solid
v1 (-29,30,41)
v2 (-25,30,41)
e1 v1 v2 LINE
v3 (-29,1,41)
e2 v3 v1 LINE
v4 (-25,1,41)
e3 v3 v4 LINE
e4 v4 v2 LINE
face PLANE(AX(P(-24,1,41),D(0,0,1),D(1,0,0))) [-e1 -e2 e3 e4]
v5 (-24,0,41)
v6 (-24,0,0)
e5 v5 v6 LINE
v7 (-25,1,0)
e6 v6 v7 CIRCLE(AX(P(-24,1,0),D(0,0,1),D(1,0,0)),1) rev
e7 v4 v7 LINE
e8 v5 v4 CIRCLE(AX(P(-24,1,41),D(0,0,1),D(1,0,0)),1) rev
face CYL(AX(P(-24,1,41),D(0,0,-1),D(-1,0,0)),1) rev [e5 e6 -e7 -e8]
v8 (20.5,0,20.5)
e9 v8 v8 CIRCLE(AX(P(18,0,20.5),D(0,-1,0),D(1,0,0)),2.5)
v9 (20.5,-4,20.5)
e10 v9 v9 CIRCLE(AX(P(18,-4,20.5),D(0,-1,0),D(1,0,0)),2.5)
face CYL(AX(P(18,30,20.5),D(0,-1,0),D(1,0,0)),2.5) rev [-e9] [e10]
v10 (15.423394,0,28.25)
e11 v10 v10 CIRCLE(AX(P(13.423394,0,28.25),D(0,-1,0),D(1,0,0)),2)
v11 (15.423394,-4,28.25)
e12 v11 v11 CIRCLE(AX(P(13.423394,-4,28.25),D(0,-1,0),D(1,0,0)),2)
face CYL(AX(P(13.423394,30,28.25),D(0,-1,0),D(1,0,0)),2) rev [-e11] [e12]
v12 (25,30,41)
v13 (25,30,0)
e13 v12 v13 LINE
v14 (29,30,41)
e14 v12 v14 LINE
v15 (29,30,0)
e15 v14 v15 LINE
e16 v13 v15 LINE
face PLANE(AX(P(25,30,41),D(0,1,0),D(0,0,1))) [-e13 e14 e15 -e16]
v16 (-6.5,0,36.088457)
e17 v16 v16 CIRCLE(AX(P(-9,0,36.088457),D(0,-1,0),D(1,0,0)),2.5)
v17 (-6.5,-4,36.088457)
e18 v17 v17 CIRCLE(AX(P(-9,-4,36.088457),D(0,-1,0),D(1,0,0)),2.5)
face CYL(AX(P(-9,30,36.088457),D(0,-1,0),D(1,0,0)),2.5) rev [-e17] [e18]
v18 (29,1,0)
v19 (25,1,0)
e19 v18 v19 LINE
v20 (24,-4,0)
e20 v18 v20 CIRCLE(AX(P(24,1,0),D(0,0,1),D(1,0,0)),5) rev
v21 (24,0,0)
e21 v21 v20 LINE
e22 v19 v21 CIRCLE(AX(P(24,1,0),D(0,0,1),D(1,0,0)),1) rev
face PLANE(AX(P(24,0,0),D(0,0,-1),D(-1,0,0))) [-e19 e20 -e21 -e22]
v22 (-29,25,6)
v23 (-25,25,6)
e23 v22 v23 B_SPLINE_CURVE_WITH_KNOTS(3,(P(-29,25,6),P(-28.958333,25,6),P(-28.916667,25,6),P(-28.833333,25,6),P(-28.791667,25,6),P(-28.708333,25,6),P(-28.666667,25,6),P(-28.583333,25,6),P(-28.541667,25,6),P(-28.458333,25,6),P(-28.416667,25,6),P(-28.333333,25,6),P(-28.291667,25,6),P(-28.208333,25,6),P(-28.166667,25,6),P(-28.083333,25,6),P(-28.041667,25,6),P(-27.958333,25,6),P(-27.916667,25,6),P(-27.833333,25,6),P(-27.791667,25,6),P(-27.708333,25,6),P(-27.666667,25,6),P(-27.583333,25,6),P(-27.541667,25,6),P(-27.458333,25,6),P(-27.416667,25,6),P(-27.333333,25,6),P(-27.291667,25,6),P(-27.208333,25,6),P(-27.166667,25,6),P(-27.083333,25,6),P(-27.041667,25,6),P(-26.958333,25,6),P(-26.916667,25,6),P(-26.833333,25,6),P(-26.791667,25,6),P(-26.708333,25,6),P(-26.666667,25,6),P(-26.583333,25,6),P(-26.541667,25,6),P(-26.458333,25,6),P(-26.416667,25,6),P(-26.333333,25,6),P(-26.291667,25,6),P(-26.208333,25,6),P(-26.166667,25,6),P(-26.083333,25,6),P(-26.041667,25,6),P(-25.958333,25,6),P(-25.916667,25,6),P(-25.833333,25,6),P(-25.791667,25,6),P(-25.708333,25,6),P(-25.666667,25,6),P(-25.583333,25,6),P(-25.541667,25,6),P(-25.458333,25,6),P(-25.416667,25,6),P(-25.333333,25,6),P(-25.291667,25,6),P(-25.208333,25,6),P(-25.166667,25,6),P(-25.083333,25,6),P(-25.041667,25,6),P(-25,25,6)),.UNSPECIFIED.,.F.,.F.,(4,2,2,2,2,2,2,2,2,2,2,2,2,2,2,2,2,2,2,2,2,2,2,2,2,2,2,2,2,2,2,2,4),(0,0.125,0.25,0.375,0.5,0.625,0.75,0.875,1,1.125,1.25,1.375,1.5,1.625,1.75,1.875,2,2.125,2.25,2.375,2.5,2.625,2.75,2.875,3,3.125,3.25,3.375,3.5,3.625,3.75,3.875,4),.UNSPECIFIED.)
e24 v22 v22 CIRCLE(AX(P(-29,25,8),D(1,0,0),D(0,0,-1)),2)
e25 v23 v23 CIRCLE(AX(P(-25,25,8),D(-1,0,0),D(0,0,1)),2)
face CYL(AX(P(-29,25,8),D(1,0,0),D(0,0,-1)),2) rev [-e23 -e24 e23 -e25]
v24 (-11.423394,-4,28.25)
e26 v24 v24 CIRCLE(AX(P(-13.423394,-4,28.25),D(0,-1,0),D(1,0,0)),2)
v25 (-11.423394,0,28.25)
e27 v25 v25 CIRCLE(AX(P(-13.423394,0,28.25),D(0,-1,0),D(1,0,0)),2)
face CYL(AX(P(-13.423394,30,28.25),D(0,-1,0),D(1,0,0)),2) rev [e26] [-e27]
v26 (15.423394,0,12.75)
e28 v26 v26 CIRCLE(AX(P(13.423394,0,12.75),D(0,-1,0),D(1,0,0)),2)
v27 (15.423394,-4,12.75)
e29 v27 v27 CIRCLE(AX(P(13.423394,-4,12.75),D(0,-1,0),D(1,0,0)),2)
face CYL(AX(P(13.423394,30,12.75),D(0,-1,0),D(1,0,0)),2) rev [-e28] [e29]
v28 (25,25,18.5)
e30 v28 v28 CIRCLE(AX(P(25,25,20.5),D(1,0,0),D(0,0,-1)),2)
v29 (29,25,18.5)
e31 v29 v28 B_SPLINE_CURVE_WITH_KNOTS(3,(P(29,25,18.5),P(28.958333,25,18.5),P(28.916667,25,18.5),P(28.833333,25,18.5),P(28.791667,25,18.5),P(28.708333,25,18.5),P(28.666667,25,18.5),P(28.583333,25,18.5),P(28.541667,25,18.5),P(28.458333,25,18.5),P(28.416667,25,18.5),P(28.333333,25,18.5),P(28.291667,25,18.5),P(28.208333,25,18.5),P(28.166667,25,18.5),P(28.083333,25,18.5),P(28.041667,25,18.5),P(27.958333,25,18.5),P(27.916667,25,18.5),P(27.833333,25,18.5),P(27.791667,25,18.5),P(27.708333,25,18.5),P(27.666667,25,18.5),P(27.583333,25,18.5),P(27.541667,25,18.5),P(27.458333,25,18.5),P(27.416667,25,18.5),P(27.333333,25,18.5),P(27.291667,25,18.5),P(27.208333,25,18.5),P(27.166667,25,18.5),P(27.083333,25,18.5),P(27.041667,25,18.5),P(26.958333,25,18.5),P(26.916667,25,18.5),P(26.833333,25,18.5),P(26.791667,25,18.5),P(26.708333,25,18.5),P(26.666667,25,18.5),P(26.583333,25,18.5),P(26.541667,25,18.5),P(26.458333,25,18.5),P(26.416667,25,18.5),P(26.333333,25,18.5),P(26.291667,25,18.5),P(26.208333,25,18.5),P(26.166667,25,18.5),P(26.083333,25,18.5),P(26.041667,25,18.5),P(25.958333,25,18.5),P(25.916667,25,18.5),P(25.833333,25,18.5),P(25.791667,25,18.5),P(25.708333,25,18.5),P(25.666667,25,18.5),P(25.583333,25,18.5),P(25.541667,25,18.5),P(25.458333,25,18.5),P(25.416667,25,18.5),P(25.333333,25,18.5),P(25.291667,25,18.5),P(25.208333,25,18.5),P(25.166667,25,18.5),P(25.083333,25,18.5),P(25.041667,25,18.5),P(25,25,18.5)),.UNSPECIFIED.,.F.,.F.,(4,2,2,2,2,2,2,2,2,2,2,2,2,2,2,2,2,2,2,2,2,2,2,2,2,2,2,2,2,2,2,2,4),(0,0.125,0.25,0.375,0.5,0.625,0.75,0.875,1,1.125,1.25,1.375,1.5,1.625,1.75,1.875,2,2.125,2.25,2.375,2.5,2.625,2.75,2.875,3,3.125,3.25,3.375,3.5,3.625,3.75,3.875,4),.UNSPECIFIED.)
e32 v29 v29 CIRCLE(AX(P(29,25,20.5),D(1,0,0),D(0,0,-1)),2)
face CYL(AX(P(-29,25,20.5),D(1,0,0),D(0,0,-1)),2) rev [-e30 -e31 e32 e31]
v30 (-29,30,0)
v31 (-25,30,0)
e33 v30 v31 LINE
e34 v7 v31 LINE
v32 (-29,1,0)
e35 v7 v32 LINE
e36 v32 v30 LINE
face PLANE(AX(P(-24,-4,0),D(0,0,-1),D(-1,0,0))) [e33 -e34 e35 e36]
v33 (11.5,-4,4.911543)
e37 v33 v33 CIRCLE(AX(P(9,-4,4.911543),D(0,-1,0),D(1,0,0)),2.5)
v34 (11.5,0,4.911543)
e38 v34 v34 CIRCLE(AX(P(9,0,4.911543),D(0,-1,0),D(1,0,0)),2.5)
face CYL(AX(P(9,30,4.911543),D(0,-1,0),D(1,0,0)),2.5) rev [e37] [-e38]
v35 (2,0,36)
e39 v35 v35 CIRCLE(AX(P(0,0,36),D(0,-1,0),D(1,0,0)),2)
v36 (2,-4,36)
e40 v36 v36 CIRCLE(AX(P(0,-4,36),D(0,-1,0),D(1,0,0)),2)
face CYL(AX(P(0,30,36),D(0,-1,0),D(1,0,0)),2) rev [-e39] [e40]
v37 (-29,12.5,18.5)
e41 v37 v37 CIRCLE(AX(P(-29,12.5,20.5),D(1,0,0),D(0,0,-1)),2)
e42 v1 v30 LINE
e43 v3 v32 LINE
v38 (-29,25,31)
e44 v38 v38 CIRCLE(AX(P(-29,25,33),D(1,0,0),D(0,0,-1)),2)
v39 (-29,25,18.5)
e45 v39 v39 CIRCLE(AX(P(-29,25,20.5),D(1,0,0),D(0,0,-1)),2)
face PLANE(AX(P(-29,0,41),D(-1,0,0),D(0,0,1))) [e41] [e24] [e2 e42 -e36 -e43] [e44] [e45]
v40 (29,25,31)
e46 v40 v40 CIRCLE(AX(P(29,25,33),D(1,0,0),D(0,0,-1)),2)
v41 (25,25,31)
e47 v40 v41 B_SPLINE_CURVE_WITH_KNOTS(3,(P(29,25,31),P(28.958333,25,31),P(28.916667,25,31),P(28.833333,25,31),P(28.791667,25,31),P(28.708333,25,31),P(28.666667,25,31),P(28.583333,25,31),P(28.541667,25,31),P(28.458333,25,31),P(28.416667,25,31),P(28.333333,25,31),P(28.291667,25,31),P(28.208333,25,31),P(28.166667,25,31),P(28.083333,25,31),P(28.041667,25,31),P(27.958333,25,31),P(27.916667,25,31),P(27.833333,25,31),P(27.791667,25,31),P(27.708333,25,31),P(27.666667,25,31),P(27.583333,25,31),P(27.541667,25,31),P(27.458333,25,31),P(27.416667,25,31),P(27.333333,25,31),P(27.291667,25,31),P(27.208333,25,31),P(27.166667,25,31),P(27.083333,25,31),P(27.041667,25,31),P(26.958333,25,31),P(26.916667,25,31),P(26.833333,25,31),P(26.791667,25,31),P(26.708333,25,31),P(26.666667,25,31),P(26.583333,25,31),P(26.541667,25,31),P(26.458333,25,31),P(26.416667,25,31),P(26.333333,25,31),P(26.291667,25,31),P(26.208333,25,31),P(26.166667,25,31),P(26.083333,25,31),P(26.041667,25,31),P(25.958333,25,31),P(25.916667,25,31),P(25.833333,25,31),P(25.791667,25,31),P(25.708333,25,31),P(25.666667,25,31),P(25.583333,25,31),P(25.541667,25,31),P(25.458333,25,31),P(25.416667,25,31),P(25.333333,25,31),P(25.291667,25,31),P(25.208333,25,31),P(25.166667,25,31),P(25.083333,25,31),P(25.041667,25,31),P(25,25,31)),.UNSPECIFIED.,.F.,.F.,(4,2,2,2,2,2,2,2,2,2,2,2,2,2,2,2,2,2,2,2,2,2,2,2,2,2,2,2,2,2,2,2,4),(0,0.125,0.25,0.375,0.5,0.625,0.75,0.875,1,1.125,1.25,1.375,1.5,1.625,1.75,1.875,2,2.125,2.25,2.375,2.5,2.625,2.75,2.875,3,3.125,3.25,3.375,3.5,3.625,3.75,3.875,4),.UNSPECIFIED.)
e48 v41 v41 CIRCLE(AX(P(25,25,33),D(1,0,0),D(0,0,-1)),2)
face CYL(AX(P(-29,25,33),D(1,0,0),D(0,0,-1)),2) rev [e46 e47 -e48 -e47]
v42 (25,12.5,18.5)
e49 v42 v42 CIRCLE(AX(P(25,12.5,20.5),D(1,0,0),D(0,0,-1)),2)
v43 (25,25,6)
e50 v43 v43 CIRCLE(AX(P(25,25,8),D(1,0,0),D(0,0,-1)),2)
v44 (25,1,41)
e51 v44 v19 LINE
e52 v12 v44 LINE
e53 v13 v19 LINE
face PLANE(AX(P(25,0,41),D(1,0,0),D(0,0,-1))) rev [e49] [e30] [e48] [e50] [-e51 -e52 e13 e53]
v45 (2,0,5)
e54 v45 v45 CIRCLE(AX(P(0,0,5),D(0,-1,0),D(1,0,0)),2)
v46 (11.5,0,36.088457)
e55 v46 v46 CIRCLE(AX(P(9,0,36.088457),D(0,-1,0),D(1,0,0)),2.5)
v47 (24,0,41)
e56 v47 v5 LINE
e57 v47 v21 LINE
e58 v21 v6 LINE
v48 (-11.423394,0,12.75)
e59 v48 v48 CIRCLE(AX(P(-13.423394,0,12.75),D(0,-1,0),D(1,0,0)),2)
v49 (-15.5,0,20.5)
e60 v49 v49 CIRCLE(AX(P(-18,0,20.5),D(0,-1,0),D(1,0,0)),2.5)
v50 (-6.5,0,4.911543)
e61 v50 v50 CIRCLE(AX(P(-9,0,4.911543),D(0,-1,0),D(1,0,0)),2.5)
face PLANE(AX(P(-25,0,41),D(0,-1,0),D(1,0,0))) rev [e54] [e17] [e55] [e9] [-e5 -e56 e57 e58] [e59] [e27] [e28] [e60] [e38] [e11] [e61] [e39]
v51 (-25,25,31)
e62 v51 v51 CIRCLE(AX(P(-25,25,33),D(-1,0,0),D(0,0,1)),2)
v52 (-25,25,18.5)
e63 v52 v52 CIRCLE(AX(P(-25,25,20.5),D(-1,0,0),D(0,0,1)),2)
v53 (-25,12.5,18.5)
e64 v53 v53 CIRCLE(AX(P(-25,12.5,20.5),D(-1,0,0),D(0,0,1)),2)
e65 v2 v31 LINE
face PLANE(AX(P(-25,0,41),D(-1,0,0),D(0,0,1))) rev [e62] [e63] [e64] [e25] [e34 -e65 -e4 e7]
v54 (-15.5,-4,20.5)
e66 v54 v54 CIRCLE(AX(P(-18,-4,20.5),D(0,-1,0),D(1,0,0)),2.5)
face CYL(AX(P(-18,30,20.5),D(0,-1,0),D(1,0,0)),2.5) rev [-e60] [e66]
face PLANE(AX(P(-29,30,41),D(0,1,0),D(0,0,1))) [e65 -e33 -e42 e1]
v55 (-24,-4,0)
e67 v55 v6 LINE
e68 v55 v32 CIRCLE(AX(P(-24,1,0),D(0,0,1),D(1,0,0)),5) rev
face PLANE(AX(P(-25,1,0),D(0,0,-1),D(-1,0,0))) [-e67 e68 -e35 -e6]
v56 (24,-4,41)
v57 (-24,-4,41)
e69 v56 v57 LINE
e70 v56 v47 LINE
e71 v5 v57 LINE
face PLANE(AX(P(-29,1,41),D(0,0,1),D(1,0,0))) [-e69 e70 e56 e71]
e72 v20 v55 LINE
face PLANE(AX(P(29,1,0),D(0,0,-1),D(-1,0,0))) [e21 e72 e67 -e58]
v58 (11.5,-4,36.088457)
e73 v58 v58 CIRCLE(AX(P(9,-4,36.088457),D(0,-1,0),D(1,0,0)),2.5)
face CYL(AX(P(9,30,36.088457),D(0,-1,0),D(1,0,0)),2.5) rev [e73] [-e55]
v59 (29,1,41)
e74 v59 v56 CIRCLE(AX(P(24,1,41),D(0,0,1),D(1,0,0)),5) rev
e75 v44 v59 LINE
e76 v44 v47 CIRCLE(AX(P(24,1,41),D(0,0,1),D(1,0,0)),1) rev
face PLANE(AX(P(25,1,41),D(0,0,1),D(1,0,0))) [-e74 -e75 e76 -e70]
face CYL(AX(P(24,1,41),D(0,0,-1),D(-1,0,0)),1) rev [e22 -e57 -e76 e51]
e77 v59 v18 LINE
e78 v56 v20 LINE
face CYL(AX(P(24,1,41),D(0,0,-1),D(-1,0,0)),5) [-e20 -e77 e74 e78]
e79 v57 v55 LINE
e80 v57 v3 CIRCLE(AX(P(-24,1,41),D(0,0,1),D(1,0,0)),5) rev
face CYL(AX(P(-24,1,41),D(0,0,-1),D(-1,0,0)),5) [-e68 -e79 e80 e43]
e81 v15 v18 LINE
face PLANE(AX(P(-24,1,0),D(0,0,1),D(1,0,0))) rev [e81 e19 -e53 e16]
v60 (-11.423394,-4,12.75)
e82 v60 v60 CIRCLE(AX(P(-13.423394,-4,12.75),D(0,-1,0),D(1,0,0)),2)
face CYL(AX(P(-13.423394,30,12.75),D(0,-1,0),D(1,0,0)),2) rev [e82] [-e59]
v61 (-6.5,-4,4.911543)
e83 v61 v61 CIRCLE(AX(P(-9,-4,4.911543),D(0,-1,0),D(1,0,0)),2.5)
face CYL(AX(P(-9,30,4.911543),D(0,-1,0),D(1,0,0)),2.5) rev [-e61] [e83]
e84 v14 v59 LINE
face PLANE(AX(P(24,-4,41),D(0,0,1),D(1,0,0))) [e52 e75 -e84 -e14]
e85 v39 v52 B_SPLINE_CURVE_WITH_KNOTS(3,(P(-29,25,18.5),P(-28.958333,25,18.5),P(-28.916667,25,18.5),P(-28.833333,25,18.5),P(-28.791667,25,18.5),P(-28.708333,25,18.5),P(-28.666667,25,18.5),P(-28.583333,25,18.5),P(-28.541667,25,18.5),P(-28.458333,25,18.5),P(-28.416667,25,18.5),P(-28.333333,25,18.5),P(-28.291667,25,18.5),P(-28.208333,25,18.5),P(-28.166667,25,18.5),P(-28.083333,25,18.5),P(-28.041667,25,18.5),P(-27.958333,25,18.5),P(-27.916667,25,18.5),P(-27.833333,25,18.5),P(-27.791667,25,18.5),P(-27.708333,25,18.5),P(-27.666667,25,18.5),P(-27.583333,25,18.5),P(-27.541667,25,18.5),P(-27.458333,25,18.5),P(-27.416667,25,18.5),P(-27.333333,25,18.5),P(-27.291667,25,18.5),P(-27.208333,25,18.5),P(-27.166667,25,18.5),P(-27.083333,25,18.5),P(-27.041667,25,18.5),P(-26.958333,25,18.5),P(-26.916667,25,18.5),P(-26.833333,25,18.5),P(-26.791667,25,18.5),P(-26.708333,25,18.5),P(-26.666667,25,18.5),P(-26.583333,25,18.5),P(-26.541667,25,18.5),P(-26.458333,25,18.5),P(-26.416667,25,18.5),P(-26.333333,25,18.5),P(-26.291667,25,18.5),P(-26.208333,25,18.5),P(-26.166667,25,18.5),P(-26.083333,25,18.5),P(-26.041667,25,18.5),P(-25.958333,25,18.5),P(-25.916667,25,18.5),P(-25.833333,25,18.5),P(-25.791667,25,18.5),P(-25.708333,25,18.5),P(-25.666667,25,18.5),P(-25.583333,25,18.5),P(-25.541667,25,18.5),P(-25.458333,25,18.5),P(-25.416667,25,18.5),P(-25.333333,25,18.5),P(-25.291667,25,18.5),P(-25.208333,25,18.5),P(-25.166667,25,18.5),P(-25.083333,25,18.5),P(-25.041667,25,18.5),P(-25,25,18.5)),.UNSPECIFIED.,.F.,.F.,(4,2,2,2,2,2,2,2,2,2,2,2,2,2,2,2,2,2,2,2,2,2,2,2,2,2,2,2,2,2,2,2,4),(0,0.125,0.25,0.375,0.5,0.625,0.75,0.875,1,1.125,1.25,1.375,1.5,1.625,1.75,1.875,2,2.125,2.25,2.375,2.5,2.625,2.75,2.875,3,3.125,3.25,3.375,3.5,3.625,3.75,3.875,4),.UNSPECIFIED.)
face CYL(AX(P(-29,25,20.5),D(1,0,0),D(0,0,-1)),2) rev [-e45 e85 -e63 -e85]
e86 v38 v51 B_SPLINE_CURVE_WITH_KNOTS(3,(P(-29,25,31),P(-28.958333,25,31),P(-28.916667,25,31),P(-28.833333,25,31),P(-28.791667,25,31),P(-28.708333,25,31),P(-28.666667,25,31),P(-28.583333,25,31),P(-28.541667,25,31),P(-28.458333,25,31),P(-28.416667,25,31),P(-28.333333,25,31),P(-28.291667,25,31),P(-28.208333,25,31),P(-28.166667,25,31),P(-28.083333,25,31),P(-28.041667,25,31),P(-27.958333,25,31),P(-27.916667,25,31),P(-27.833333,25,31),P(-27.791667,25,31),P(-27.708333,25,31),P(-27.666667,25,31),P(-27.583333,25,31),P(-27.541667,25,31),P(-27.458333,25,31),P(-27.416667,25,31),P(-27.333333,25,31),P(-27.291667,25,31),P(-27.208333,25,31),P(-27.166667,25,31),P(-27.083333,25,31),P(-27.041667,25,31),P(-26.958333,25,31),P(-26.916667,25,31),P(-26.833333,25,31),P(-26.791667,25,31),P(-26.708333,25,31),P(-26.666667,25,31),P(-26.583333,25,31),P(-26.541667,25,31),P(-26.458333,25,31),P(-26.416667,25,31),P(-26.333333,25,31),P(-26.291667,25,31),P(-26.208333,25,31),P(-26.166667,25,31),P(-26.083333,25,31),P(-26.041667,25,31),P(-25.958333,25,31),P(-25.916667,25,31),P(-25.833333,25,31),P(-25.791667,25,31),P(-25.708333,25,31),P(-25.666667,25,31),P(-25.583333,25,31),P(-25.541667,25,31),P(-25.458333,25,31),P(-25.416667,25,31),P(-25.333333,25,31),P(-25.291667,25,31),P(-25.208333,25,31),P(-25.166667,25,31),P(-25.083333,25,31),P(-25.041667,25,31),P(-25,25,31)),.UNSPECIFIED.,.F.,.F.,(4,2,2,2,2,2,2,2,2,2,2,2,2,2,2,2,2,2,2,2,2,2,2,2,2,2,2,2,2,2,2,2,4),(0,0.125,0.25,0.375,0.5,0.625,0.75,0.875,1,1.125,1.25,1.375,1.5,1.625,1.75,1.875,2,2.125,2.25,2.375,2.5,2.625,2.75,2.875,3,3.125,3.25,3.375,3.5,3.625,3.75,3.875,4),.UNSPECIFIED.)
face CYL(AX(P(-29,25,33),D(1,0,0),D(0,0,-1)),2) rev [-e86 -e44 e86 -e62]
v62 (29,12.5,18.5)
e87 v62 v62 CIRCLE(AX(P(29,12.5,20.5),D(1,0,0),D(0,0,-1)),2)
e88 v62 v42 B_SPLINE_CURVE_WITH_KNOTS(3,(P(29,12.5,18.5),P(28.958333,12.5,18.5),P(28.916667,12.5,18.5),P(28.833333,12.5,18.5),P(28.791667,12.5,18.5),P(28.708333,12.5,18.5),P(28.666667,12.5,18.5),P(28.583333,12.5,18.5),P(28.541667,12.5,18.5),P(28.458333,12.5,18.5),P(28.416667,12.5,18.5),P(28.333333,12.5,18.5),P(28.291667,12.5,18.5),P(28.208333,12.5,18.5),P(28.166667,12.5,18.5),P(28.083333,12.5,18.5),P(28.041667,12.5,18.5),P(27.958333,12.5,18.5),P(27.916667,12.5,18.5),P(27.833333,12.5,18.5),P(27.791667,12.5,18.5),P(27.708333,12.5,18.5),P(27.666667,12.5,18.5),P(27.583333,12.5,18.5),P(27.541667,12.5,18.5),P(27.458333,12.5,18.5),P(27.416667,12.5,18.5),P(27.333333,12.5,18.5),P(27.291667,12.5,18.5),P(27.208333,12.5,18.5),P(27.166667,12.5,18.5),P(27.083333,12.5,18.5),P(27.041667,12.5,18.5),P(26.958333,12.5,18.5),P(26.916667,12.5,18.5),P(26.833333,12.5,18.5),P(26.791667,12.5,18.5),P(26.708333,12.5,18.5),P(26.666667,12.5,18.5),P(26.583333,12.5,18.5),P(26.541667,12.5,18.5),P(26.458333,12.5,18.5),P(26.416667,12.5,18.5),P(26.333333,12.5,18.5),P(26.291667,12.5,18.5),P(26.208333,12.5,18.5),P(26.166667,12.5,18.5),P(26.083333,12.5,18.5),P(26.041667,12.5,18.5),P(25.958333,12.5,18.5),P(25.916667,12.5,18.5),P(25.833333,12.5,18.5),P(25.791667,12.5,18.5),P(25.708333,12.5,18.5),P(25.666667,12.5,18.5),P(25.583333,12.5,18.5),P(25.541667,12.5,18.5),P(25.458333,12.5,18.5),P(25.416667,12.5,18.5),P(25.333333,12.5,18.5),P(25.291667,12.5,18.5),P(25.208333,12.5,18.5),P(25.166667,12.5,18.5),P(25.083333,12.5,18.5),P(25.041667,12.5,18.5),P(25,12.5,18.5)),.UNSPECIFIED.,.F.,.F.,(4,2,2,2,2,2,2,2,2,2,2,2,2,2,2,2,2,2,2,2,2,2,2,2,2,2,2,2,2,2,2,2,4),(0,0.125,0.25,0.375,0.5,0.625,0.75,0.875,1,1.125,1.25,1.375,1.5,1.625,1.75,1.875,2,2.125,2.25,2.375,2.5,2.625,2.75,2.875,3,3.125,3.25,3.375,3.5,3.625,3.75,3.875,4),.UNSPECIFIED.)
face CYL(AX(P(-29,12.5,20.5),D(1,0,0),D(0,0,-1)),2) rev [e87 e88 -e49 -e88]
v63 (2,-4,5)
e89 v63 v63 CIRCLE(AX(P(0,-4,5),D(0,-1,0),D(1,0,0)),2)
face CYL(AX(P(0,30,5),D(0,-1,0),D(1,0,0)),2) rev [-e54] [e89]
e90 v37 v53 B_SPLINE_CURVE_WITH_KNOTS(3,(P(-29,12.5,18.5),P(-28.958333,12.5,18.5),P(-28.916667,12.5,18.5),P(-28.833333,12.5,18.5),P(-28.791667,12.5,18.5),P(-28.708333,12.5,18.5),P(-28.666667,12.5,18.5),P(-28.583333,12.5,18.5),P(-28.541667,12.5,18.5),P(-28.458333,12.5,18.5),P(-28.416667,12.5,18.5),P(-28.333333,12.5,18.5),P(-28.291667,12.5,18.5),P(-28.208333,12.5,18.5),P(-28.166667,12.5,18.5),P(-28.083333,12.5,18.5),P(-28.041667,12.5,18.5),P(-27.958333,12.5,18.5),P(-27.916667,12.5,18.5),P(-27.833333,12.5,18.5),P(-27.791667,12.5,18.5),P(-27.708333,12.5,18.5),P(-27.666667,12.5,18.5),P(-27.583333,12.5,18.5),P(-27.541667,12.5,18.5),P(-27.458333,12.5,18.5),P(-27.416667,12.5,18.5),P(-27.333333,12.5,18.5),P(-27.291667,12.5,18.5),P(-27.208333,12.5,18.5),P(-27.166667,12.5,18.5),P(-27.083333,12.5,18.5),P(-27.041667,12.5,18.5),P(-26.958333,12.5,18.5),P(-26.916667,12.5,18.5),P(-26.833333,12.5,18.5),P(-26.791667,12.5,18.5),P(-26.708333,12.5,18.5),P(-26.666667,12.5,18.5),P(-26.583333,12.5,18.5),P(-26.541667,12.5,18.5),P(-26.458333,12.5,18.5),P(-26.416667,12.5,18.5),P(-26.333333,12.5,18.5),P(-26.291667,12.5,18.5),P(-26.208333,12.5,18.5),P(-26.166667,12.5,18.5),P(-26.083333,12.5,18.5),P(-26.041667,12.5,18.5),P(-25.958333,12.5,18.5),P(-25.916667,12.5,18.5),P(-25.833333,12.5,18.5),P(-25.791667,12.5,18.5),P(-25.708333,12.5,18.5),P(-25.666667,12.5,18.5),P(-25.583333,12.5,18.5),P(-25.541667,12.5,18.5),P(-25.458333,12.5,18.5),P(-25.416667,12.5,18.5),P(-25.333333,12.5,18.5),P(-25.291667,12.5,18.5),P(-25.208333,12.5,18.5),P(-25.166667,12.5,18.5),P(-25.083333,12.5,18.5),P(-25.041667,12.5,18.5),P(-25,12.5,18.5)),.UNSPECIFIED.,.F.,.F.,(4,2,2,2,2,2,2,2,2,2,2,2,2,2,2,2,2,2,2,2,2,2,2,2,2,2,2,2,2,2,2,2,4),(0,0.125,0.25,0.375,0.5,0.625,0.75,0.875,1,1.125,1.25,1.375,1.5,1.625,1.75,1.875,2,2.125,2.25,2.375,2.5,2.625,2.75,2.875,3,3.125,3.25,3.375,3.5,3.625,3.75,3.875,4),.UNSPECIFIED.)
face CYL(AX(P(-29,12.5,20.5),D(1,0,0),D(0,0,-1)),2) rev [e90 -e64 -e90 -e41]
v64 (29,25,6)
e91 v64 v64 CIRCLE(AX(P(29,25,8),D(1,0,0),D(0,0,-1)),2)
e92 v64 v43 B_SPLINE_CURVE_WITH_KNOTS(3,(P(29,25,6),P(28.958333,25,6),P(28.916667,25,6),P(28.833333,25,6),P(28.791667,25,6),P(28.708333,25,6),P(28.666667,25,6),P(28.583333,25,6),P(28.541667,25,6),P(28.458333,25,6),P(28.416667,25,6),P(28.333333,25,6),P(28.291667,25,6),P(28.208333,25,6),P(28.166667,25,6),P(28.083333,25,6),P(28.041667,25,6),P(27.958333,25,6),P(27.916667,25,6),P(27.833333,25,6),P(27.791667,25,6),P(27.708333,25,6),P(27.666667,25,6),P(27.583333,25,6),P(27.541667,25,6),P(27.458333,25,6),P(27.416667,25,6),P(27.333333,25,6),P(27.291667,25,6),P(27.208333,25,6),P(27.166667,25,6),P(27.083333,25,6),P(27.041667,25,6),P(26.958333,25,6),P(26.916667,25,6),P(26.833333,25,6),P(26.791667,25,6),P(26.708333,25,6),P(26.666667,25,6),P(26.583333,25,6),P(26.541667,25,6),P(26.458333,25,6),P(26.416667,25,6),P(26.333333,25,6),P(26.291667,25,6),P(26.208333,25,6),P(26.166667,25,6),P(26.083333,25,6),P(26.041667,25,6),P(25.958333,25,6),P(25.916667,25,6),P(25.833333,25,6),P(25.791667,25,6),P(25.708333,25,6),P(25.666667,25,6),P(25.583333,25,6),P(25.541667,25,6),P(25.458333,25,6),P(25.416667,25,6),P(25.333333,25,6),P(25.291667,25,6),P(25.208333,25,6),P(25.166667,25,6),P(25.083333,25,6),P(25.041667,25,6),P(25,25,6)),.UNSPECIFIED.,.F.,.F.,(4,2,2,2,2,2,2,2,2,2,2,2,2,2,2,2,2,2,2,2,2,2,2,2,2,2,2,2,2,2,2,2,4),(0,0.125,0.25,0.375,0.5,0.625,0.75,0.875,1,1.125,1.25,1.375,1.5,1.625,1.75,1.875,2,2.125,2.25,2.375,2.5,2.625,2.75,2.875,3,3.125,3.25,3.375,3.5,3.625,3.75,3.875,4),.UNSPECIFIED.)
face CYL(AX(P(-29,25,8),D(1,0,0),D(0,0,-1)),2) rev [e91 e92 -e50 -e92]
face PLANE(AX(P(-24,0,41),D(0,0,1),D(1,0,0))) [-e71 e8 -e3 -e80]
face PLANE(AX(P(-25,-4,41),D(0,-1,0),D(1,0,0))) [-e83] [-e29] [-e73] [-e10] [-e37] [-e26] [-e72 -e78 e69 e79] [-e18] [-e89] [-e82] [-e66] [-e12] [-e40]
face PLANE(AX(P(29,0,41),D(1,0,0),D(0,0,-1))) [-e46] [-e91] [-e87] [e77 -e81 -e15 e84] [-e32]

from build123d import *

# Parameters (mm, degrees)
SM_BASE_FLANGE_1_DEPTH   = 41
SKETCH_9_R               = 2.5
SKETCH_9_R_2             = 2
CUT_EXTRUDE_4_DEPTH      = 61.6465168
CUT_EXTRUDE_5_DEPTH      = 78.103826105
CUT_EXTRUDE_5_DEPTH_BACK = 78.103826105
SKETCH_10_R              = 2


# Sheet-metal steps are written as plain solids
with BuildPart() as part:
    # Sketch 1 → Базовая кромка1 (new body)
    with BuildSketch(Plane.XY):
        with BuildLine():
            Line((-25, 30), (-25, 1))
            ThreePointArc((-25, 1), (-24.707106781, 0.292893219), (-24, 0))
            Line((-24, 0), (24, 0))
            ThreePointArc((24, 0), (24.707106781, 0.292893219), (25, 1))
            Line((25, 1), (25, 30))
            Line((25, 30), (29, 30))
            Line((29, 30), (29, 1))
            ThreePointArc((29, 1), (27.535533906, -2.535533906), (24, -4))
            Line((24, -4), (-24, -4))
            ThreePointArc((-24, -4), (-27.535533906, -2.535533906), (-29, 1))
            Line((-29, 1), (-29, 30))
            Line((-29, 30), (-25, 30))
        make_face()
    extrude(amount=SM_BASE_FLANGE_1_DEPTH)

    # Эскиз9 → Вырез-Вытянуть4 (cut, through all)
    with BuildSketch(Plane.XZ.offset(4)):
        with Locations((-18, 20.5)):
            Circle(SKETCH_9_R)
        with Locations((-9, 36.088457268)):
            Circle(SKETCH_9_R)
        with Locations((9, 36.088457268)):
            Circle(SKETCH_9_R)
        with Locations((18, 20.5)):
            Circle(SKETCH_9_R)
        with Locations((9, 4.911542732)):
            Circle(SKETCH_9_R)
        with Locations((-9, 4.911542732)):
            Circle(SKETCH_9_R)
        with Locations((0, 5)):
            Circle(SKETCH_9_R_2)
        with Locations((-13.423393759, 12.75)):
            Circle(SKETCH_9_R_2)
        with Locations((-13.423393759, 28.25)):
            Circle(SKETCH_9_R_2)
        with Locations((0, 36)):
            Circle(SKETCH_9_R_2)
        with Locations((13.423393759, 28.25)):
            Circle(SKETCH_9_R_2)
        with Locations((13.423393759, 12.75)):
            Circle(SKETCH_9_R_2)
    extrude(amount=-CUT_EXTRUDE_4_DEPTH, mode=Mode.SUBTRACT)

    # Эскиз10 → Вырез-Вытянуть5 (cut, two sides: drawn at the far end of the back side and taken through both)
    with BuildSketch(Plane(origin=(29, 0, 0), x_dir=(0, 0, -1), z_dir=(1, 0, 0)).offset(-CUT_EXTRUDE_5_DEPTH_BACK)):
        with Locations((-33, 25)):
            Circle(SKETCH_10_R)
        with Locations((-20.5, 25)):
            Circle(SKETCH_10_R)
        with Locations((-8, 25)):
            Circle(SKETCH_10_R)
        with Locations((-20.5, 12.5)):
            Circle(SKETCH_10_R)
    extrude(amount=CUT_EXTRUDE_5_DEPTH + CUT_EXTRUDE_5_DEPTH_BACK, mode=Mode.SUBTRACT)


solid = part.part
